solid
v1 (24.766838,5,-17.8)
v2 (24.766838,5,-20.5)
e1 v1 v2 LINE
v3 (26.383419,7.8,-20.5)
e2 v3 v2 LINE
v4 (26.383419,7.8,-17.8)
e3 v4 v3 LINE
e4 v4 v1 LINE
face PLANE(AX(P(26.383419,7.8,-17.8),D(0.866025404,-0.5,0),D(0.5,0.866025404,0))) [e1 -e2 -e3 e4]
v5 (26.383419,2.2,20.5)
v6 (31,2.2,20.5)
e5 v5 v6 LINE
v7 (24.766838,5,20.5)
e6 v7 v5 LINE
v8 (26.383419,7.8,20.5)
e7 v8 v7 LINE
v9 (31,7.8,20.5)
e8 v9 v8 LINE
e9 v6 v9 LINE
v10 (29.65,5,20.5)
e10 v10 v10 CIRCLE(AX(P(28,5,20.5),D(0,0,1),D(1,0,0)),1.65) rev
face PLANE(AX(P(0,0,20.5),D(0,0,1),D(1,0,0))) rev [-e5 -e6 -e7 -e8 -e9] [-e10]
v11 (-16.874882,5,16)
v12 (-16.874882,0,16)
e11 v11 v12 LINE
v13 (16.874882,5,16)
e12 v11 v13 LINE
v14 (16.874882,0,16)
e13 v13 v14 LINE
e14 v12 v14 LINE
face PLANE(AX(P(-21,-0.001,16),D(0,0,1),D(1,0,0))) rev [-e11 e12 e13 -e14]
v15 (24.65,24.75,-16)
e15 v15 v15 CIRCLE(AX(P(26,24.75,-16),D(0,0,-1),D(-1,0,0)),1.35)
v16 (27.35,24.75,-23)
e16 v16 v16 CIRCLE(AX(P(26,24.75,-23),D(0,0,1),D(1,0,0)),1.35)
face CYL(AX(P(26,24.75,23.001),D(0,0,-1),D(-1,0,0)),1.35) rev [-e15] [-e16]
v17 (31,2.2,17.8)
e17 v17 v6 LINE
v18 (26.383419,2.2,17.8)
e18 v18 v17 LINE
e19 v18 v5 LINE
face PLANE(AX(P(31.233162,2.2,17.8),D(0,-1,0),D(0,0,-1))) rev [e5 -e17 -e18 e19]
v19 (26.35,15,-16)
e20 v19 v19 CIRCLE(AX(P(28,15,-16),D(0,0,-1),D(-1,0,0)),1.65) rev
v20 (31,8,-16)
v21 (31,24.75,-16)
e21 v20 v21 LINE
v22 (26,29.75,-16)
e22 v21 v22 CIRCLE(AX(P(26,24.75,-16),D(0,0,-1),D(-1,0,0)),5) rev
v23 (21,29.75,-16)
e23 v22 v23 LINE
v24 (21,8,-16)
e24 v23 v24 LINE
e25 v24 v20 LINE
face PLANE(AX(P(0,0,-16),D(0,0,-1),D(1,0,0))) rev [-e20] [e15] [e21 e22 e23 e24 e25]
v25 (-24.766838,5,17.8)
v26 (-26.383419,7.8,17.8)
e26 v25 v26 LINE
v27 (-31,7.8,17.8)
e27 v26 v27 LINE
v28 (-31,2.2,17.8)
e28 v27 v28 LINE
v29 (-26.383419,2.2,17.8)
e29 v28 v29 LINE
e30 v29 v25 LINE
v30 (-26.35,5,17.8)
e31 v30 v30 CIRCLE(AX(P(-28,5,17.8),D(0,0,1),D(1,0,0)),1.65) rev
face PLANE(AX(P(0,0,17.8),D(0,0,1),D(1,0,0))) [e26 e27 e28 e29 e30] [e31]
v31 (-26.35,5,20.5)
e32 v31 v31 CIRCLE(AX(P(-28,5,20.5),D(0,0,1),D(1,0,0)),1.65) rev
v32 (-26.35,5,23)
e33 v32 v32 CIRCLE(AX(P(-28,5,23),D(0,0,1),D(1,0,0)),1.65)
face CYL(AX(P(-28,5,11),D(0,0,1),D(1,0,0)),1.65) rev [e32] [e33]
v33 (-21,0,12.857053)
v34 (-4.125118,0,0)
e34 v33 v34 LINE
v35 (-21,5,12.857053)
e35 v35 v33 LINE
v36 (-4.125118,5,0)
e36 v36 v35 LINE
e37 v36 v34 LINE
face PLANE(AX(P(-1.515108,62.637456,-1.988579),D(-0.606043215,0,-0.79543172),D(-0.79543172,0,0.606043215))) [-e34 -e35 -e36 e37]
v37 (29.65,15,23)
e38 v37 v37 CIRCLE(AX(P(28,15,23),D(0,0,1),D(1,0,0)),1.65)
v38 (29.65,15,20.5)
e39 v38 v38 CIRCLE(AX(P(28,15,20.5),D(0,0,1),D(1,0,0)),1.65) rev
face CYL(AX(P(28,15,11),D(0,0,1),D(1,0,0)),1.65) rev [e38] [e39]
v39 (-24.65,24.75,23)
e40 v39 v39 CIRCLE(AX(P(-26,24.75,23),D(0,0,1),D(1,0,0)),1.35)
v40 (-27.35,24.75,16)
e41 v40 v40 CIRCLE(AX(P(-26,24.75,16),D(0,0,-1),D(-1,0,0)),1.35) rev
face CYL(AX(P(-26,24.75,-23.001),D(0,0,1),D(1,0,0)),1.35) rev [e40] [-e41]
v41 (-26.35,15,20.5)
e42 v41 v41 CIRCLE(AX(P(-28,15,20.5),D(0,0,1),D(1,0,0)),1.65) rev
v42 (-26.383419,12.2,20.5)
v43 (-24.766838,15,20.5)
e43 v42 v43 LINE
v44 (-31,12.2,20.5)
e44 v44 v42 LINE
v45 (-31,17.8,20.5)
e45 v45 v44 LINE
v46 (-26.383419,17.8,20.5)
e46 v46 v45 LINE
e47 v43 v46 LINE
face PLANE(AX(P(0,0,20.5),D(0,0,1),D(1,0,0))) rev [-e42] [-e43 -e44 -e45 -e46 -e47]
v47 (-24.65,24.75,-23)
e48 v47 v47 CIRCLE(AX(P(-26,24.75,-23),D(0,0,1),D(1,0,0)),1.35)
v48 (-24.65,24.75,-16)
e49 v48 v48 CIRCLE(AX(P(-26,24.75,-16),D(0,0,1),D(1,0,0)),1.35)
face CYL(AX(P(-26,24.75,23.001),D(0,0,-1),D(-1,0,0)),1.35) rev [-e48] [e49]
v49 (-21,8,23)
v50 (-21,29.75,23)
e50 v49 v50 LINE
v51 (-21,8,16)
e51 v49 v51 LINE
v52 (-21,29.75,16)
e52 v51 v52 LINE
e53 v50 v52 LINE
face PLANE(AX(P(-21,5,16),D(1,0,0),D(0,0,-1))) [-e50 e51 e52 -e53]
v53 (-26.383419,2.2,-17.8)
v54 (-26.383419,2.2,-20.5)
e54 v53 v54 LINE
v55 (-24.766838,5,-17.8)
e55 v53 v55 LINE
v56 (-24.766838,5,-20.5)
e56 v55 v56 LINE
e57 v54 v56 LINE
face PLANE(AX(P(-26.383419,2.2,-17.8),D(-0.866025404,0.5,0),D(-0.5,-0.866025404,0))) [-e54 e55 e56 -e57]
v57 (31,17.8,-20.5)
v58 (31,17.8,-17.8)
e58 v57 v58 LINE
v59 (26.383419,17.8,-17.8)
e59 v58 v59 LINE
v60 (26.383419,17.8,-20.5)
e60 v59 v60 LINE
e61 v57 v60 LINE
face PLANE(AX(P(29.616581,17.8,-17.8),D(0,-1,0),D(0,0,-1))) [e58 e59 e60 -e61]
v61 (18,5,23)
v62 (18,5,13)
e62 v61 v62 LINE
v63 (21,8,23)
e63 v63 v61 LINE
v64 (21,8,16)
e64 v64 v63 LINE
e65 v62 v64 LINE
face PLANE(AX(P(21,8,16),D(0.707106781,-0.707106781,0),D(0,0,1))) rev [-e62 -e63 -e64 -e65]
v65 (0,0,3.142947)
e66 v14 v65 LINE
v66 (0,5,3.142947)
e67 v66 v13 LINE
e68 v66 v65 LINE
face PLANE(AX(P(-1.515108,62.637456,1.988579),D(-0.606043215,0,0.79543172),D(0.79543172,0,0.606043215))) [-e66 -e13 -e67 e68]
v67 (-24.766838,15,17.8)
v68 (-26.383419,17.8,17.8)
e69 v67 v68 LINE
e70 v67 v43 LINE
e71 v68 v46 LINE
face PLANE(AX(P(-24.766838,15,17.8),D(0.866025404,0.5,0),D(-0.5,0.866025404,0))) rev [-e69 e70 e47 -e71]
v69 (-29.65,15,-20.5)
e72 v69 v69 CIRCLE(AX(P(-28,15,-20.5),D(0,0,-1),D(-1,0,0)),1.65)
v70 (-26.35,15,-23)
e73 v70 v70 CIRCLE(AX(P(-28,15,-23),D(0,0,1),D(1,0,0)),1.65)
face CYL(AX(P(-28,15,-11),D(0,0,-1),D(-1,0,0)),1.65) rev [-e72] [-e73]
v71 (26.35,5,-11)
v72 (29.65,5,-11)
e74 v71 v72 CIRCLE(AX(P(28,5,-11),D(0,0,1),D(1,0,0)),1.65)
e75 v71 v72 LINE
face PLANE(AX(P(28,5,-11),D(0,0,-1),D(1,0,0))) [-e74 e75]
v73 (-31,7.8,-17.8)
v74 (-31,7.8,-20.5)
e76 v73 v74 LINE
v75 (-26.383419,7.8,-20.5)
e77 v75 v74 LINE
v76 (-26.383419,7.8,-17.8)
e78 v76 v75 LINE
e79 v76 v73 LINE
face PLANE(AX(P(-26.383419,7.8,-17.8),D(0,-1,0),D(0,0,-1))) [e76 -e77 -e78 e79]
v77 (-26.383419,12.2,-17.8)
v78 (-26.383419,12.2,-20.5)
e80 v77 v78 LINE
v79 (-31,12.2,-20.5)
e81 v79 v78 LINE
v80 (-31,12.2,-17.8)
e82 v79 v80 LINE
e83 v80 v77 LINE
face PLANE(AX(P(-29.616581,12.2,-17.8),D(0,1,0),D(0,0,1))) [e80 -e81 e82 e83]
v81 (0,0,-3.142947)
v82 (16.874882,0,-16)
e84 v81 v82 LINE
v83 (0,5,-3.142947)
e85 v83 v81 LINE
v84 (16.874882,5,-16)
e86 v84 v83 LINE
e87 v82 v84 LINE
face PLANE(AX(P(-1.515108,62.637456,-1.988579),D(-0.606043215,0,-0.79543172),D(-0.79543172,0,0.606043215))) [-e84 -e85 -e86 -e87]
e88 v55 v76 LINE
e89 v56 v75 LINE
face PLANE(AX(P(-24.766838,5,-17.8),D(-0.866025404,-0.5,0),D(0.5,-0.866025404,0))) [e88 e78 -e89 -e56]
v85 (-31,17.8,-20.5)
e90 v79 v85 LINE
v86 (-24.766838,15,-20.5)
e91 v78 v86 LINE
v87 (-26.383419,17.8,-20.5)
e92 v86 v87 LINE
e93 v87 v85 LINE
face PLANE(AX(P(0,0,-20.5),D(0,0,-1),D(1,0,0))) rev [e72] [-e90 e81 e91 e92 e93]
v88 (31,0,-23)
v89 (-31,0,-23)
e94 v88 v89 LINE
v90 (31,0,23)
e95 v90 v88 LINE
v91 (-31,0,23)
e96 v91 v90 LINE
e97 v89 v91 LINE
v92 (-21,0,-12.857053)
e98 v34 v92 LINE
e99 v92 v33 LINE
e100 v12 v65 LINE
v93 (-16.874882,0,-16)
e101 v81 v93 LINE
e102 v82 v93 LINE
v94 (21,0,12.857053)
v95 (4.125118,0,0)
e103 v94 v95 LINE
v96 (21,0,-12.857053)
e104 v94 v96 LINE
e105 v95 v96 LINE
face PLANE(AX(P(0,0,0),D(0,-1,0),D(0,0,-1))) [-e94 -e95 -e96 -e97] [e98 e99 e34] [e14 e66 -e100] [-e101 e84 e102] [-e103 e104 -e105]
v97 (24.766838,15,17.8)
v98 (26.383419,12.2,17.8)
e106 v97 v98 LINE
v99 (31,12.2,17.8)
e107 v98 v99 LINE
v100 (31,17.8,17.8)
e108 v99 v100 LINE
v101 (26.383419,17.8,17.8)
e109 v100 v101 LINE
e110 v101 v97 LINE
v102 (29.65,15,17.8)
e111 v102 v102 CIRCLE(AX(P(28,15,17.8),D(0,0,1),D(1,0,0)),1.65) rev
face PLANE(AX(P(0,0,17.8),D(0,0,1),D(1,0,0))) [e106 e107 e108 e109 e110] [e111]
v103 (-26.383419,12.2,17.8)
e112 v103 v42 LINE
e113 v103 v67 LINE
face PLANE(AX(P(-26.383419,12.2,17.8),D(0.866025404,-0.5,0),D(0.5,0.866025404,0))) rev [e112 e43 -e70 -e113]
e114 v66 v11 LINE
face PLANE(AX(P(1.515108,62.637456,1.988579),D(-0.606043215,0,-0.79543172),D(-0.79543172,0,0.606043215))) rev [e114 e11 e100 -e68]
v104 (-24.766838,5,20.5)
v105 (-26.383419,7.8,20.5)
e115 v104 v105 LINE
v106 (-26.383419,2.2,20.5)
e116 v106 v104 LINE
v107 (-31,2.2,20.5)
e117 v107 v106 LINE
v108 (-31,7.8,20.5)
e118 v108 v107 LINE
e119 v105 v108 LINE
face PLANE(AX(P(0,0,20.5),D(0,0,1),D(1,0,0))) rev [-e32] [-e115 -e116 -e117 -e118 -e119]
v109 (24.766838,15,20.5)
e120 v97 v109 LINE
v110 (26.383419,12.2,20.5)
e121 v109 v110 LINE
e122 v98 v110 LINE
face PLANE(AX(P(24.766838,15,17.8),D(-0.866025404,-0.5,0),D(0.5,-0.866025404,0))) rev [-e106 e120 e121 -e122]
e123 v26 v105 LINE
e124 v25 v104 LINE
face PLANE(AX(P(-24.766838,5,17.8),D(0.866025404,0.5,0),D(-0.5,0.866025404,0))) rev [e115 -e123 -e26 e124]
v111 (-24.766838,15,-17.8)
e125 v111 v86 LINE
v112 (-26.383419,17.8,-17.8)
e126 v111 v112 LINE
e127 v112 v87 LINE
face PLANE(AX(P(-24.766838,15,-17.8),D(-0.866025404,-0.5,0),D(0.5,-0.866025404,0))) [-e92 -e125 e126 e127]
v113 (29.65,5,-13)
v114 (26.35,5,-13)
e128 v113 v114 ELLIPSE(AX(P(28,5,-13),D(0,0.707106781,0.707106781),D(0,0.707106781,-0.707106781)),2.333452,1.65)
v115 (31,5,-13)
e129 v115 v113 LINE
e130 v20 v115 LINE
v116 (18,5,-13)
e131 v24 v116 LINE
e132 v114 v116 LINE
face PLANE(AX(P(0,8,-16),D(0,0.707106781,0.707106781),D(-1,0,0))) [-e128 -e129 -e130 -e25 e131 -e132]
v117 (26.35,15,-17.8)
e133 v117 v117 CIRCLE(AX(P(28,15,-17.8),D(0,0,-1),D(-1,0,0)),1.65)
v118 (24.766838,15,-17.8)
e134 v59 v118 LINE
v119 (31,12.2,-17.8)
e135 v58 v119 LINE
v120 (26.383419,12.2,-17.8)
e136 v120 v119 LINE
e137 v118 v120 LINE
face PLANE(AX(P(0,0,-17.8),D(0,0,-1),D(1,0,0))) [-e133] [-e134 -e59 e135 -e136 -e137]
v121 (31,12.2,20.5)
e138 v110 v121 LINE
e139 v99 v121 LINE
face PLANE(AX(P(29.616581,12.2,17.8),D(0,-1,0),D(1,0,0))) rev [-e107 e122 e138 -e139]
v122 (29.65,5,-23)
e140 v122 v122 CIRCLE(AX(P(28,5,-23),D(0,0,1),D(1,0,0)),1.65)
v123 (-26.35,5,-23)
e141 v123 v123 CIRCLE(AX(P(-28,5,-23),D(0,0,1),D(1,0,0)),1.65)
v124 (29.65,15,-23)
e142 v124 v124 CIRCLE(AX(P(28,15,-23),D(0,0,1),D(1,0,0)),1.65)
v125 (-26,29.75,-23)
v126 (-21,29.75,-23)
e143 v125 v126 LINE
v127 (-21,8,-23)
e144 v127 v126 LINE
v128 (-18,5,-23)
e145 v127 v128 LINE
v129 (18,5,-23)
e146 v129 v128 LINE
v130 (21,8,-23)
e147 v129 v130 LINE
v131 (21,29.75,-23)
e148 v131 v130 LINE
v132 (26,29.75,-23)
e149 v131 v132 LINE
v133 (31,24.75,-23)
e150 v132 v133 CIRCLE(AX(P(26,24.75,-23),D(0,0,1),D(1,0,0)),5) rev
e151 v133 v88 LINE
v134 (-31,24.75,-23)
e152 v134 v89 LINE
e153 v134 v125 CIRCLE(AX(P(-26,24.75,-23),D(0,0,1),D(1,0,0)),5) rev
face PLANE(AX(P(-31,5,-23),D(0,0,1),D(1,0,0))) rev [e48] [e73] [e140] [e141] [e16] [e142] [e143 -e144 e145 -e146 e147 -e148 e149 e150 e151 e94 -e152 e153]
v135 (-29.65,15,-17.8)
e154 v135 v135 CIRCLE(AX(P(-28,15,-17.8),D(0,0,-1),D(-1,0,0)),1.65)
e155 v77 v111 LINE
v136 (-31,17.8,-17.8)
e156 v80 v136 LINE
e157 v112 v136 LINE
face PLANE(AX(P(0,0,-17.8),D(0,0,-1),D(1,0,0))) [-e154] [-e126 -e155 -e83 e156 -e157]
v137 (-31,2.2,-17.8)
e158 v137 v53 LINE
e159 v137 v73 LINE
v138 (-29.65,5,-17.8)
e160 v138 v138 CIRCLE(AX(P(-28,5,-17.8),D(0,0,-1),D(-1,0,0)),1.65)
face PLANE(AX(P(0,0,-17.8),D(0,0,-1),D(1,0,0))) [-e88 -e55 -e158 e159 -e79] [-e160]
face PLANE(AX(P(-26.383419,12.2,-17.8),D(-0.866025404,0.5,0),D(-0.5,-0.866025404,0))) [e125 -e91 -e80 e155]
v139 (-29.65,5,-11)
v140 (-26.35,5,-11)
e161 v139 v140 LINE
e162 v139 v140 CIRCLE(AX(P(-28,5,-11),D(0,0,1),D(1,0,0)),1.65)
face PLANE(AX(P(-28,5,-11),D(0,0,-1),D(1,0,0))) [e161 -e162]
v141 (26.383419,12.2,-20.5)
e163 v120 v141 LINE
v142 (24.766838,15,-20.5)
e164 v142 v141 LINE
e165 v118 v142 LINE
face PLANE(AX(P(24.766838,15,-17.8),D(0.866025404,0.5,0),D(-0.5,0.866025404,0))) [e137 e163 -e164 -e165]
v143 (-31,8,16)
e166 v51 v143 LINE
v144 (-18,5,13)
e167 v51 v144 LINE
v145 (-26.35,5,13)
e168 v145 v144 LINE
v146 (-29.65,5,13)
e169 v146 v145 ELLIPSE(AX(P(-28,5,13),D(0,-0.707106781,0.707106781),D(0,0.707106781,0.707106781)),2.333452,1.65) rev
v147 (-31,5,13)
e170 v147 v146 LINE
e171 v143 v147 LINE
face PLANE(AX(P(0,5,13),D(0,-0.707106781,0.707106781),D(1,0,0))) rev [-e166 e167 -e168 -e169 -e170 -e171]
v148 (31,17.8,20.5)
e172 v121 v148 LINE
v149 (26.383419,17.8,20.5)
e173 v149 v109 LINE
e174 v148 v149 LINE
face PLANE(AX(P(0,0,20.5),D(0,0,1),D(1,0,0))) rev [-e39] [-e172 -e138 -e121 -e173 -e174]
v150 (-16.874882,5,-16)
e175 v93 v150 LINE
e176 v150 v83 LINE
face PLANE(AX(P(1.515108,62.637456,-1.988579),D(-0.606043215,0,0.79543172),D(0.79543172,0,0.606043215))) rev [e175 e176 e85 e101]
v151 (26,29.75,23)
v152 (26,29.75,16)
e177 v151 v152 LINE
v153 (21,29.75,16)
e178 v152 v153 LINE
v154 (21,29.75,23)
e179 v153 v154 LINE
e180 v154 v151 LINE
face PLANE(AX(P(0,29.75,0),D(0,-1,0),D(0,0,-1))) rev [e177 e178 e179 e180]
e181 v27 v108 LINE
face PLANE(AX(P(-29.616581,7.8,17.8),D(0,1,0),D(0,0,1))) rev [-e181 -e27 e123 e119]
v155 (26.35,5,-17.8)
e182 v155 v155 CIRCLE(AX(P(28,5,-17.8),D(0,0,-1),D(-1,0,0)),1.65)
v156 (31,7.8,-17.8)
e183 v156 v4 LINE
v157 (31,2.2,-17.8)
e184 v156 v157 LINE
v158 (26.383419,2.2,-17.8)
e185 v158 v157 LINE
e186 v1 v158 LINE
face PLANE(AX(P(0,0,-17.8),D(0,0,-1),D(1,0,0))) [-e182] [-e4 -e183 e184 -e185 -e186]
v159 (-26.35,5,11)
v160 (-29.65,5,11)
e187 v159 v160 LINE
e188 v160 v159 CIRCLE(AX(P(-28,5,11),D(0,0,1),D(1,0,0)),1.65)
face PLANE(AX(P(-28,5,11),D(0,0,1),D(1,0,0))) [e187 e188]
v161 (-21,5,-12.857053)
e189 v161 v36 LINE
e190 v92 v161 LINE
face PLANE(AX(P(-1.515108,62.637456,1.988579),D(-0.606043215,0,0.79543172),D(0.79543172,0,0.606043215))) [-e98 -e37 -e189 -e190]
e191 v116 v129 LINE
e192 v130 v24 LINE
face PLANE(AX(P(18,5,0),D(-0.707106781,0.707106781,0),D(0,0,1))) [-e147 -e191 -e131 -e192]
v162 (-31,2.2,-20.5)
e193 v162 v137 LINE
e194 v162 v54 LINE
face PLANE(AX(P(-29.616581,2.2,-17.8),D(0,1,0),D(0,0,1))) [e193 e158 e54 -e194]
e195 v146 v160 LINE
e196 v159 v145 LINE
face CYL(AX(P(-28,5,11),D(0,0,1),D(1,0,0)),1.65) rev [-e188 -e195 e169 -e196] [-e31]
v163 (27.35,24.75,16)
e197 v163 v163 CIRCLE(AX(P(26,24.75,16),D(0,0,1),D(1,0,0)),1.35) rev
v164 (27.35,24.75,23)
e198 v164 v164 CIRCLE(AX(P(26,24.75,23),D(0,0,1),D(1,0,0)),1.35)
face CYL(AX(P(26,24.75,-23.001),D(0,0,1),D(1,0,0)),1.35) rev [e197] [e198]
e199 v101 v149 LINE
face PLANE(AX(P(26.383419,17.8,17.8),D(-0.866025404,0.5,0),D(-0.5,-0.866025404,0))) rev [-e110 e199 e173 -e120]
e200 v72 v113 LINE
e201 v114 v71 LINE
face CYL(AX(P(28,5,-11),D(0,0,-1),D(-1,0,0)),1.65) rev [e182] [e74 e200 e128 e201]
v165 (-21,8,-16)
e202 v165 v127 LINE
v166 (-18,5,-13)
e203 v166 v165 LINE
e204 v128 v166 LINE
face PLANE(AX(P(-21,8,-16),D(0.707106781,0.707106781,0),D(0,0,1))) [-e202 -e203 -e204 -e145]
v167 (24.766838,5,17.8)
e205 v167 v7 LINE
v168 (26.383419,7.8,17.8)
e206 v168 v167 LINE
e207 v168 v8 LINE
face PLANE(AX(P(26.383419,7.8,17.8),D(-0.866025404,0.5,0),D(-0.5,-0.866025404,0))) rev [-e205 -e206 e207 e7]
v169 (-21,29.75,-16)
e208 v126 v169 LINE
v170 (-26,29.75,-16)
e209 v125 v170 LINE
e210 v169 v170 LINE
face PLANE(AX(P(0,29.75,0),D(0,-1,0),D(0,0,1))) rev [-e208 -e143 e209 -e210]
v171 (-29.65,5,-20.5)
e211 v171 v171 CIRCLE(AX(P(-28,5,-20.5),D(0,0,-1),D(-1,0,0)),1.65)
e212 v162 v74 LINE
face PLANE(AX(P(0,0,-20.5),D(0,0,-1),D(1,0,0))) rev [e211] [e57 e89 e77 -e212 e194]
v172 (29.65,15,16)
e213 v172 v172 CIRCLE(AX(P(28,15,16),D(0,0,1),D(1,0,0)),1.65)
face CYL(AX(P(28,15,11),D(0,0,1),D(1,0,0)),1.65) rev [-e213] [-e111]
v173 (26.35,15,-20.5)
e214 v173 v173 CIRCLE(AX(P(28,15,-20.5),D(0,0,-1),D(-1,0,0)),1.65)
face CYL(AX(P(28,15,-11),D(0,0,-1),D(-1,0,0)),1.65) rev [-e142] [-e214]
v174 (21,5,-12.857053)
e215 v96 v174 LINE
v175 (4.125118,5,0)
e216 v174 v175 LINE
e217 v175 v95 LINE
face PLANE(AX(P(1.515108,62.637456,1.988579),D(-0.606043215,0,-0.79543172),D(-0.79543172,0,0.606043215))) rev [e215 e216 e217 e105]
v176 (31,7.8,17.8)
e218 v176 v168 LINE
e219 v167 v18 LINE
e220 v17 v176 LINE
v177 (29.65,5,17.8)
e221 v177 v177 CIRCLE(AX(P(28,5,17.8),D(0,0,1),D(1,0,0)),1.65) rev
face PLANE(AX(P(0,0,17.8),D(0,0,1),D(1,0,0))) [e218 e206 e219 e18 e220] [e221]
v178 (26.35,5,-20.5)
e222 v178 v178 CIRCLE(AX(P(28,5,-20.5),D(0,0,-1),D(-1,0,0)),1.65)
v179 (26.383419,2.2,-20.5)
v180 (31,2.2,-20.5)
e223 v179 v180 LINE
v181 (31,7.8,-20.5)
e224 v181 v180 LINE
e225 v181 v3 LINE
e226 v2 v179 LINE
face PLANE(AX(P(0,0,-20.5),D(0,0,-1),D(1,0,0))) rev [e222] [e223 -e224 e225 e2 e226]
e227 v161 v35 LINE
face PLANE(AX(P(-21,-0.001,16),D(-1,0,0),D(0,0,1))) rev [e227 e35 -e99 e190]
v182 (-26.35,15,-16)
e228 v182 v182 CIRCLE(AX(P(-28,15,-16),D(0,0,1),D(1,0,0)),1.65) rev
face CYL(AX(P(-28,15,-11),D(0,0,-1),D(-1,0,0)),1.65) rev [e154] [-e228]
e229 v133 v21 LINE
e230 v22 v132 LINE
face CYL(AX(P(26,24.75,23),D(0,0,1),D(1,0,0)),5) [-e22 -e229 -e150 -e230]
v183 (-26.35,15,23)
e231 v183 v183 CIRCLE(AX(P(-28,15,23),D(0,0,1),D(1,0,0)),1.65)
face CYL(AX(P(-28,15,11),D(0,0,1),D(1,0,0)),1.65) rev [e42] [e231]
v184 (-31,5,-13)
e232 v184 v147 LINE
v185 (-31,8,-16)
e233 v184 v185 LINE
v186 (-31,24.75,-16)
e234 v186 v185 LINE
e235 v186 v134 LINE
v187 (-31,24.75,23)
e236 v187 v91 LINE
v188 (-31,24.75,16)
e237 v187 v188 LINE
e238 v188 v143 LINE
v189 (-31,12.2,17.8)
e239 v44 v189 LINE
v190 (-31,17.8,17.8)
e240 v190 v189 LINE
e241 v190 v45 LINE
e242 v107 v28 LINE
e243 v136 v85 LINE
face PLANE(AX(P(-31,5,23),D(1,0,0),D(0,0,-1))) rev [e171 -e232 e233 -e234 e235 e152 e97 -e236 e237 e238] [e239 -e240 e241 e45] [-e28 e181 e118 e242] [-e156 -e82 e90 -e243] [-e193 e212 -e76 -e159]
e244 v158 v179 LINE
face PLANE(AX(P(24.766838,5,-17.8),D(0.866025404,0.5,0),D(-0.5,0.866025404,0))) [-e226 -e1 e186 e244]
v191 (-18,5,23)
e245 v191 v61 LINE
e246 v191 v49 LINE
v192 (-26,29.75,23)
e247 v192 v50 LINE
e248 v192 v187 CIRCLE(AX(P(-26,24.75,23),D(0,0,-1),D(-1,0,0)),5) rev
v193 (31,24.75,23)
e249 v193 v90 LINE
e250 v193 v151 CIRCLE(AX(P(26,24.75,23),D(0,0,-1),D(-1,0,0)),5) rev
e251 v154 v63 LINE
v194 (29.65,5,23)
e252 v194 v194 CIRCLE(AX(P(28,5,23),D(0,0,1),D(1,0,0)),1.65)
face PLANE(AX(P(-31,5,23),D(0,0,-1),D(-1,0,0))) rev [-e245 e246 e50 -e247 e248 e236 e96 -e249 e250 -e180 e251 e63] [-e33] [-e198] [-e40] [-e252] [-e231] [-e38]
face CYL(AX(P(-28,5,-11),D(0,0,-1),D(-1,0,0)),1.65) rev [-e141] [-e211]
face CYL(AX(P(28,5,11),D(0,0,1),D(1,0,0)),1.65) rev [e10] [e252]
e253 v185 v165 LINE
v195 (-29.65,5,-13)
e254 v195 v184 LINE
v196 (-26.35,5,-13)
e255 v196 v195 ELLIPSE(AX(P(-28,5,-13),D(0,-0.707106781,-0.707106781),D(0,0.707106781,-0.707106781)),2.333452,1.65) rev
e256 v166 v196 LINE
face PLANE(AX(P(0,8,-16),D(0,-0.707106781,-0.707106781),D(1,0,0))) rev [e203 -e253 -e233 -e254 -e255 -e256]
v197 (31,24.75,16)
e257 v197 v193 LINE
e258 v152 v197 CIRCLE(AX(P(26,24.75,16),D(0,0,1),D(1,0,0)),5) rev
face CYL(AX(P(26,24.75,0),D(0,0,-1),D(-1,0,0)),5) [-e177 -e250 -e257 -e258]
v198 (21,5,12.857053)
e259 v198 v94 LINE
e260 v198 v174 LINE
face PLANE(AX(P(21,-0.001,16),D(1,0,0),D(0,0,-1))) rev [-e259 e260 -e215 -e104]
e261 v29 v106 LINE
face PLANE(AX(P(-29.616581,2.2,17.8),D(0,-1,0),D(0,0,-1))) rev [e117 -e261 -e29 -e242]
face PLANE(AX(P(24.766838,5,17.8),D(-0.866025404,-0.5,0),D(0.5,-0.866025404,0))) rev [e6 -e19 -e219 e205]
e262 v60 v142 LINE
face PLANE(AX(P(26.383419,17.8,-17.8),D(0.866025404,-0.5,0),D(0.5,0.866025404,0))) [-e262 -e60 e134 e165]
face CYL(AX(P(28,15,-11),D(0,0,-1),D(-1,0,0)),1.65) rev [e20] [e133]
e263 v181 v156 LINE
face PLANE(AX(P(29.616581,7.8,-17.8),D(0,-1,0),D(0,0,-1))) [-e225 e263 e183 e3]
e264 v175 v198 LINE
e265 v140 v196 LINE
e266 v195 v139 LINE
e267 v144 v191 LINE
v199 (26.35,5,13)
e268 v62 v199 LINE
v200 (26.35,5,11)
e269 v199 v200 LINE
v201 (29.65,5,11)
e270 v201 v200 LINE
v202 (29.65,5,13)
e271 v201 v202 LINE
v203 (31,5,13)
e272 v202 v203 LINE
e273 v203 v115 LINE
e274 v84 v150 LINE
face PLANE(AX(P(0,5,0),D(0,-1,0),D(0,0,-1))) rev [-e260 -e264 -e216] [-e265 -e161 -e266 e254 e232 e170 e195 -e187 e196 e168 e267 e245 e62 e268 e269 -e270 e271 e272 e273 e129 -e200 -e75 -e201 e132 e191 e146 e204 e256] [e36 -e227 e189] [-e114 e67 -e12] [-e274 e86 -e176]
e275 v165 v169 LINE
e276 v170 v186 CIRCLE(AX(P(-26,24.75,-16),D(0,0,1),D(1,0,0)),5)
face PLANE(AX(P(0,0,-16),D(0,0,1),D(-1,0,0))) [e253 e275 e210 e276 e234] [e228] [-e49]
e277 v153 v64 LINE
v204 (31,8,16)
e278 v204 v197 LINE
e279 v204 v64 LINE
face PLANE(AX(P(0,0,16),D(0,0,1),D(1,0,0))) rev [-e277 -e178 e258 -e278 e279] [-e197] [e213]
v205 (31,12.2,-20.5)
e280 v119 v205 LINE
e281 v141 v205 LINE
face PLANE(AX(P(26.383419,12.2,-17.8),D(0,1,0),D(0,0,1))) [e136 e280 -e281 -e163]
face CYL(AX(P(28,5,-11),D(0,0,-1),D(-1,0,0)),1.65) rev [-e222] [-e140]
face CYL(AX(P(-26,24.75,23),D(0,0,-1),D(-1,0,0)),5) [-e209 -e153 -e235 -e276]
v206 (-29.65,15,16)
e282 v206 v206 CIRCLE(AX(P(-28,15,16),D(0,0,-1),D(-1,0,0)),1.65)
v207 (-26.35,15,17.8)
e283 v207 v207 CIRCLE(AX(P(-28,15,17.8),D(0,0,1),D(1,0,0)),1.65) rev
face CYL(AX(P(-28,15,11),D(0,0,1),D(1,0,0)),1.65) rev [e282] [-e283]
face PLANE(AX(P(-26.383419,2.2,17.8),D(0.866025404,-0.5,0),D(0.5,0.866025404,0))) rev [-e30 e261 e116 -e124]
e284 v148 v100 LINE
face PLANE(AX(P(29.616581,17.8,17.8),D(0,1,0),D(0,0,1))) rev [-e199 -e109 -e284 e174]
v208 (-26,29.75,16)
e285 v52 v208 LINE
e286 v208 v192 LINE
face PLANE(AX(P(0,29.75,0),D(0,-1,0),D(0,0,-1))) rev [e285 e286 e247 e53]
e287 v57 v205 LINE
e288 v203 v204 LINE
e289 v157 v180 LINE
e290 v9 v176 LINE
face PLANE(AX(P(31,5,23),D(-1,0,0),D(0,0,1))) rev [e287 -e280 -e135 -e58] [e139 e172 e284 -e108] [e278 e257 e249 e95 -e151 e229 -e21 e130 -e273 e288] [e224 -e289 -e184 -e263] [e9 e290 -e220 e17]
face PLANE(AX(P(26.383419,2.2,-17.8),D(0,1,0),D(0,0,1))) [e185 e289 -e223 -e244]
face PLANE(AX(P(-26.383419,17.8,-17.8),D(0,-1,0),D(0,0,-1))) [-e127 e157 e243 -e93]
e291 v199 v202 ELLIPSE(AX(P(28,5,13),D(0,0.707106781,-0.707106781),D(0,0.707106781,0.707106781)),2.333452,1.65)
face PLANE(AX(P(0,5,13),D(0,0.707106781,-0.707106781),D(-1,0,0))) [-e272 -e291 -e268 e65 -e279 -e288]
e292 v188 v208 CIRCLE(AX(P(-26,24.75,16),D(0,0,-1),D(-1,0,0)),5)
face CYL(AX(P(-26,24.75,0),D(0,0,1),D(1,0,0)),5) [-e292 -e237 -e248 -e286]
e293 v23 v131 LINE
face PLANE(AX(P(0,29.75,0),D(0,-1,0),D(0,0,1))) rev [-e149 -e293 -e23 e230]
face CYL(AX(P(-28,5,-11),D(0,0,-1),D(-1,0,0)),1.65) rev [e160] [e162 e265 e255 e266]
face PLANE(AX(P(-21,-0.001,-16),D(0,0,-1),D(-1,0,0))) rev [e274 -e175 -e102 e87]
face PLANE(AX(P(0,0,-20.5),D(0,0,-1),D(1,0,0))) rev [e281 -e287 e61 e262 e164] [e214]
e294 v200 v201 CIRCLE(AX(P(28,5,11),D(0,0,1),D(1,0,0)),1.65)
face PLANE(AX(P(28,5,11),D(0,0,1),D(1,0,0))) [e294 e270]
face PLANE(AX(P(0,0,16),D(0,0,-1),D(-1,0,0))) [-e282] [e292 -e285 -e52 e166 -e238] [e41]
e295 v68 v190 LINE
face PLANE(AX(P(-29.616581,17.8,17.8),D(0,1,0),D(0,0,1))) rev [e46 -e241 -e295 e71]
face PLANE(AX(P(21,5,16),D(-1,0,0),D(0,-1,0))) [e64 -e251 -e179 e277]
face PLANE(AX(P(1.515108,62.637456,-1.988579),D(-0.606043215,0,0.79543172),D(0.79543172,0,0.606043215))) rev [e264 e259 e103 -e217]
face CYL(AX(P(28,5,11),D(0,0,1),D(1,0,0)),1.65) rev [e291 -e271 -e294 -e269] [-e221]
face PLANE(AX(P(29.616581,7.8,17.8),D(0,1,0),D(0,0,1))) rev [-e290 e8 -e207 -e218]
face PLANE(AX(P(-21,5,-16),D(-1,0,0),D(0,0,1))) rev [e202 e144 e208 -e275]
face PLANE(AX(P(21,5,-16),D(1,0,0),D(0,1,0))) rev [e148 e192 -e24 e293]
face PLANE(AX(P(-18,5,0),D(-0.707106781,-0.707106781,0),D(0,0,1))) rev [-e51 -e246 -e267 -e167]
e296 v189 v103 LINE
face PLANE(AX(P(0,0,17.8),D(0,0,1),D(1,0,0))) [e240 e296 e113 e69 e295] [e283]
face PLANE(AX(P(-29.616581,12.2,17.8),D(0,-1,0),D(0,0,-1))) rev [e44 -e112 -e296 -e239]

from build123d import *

# Parameters (mm, degrees)
SKETCH_1_W          = 62
SKETCH_1_H          = 46
EXTRUDE_1_DEPTH     = 5
SKETCH_2_W          = 10
SKETCH_2_H          = 15
EXTRUDE_2_DEPTH     = 7
SKETCH_3_R          = 1.65
CUT_EXTRUDE_1_DEPTH = 12
SKETCH_7_W          = 10
SKETCH_7_H          = 7
EXTRUDE_4_DEPTH     = 9.75
CUT_EXTRUDE_4_REACH = 64.945
SKETCH_8_R          = 1.35
CUT_EXTRUDE_2_DEPTH = 2.7
CUT_EXTRUDE_3_REACH = 50.735
SKETCH_5_W          = 42
SKETCH_5_H          = 32
EXTRUDE_3_DEPTH     = 5
CHAMFER_4_SIZE      = 3
FILLET_1_R          = 5


with BuildPart() as part:
    # 草图1 → 凸台-拉伸1 (new body)
    with BuildSketch(Plane(origin=(0, 0, 0), x_dir=(1, 0, 0), z_dir=(0, 1, 0))):
        Rectangle(SKETCH_1_W, SKETCH_1_H)
    extrude(amount=EXTRUDE_1_DEPTH)

    # 草图2 → 凸台-拉伸2 (add)
    with BuildSketch(Plane.XY.offset(23)):
        with Locations((-26, 12.5)):
            Rectangle(SKETCH_2_W, SKETCH_2_H)
        with Locations((26, 12.5)):
            Rectangle(SKETCH_2_W, SKETCH_2_H)
    extrude_2 = extrude(amount=-EXTRUDE_2_DEPTH)

    # 草图3 → 切除-拉伸1 (cut)
    with BuildSketch(Plane.XY.offset(23)):
        with Locations((-28, 15)):
            Circle(SKETCH_3_R)
        with Locations((-28, 5)):
            Circle(SKETCH_3_R)
        with Locations((28, 5)):
            Circle(SKETCH_3_R)
        with Locations((28, 15)):
            Circle(SKETCH_3_R)
    cut_extrude_1 = extrude(amount=-CUT_EXTRUDE_1_DEPTH, mode=Mode.SUBTRACT)

    # 草图7 → 凸台-拉伸4 (add)
    with BuildSketch(Plane(origin=(0, 20, 0), x_dir=(1, 0, 0), z_dir=(0, 1, 0))):
        with Locations((-26, -19.5)):
            Rectangle(SKETCH_7_W, SKETCH_7_H)
        with Locations((26, -19.5)):
            Rectangle(SKETCH_7_W, SKETCH_7_H)
    extrude_4 = extrude(amount=EXTRUDE_4_DEPTH)

    # 草图8 → 切除-拉伸4 (cut, up to next)
    with BuildSketch(Plane.XY.offset(23), mode=Mode.PRIVATE) as cut_extrude_4_sk1:
        with Locations((-26, 24.75)):
            Circle(SKETCH_8_R)
    cut_extrude_4_tool1 = extrude(cut_extrude_4_sk1.sketch, amount=-CUT_EXTRUDE_4_REACH, mode=Mode.PRIVATE) & part.part
    # 草图8 → 切除-拉伸4 (cut, up to next)
    with BuildSketch(Plane.XY.offset(23), mode=Mode.PRIVATE) as cut_extrude_4_sk2:
        with Locations((26, 24.75)):
            Circle(SKETCH_8_R)
    cut_extrude_4_tool2 = extrude(cut_extrude_4_sk2.sketch, amount=-CUT_EXTRUDE_4_REACH, mode=Mode.PRIVATE) & part.part
    cut_extrude_4_1 = cut_extrude_4_tool1.solids().sort_by_distance((-26, 24.75, 23))[0]
    add(cut_extrude_4_1, mode=Mode.SUBTRACT)
    cut_extrude_4_2 = cut_extrude_4_tool2.solids().sort_by_distance((26, 24.75, 23))[0]
    add(cut_extrude_4_2, mode=Mode.SUBTRACT)
    cut_extrude_4 = cut_extrude_4_1 + cut_extrude_4_2  # 切除-拉伸4 as one shape, for the pattern or mirror that repeats it

    # 草图4 → 切除-拉伸2 (cut)
    with BuildSketch(Plane.XY.offset(20.5)):
        Polygon((-29.616580754, 17.8), (-31.233161507, 17.8), (-31.233161507, 15), (-31.233161507, 12.2), (-29.616580754, 12.2), (-26.383419246, 12.2), (-24.766838493, 15), (-26.383419246, 17.8), align=None)
        Polygon((-24.766838493, 5), (-26.383419246, 7.8), (-29.616580754, 7.8), (-31.233161507, 7.8), (-31.233161507, 5), (-31.233161507, 2.2), (-29.616580754, 2.2), (-26.383419246, 2.2), align=None)
        Polygon((24.766838493, 15), (26.383419246, 12.2), (29.616580754, 12.2), (31.233161507, 12.2), (31.233161507, 15), (31.233161507, 17.8), (29.616580754, 17.8), (26.383419246, 17.8), align=None)
        Polygon((24.766838493, 5), (26.383419246, 2.2), (29.616580754, 2.2), (31.233161507, 2.2), (31.233161507, 5), (31.233161507, 7.8), (29.616580754, 7.8), (26.383419246, 7.8), align=None)
    cut_extrude_2 = extrude(amount=-CUT_EXTRUDE_2_DEPTH, mode=Mode.SUBTRACT)

    # 镜向1: 凸台-拉伸2, 切除-拉伸1, 凸台-拉伸4, 切除-拉伸4, 切除-拉伸2 across plane
    add(extrude_2.mirror(Plane.XY))
    add(cut_extrude_1.mirror(Plane.XY), mode=Mode.SUBTRACT)
    add(extrude_4.mirror(Plane.XY))
    add(cut_extrude_4.mirror(Plane.XY), mode=Mode.SUBTRACT)
    add(cut_extrude_2.mirror(Plane.XY), mode=Mode.SUBTRACT)

    # 草图5 → 切除-拉伸3 (cut, up to next)
    with BuildSketch(Plane(origin=(0, 29.75, 0), x_dir=(1, 0, 0), z_dir=(0, 1, 0)), mode=Mode.PRIVATE) as cut_extrude_3_sk1:
        Rectangle(SKETCH_5_W, SKETCH_5_H)
    cut_extrude_3_tool1 = extrude(cut_extrude_3_sk1.sketch, amount=-CUT_EXTRUDE_3_REACH, mode=Mode.PRIVATE) & part.part
    add(cut_extrude_3_tool1.solids().sort_by_distance((0, 29.75, 0))[0], mode=Mode.SUBTRACT)

    # 草图6 → 凸台-拉伸3 (add)
    with BuildSketch(Plane(origin=(0, 0, 0), x_dir=(1, 0, 0), z_dir=(0, 1, 0))):
        Polygon((-22.515108038, 14.0114207), (-4.12511837, 0), (0, 3.142947329), (-19.484891962, 17.9885793), align=None)
        Polygon((0, 3.142947329), (4.12511837, 0), (22.515108038, 14.0114207), (19.484891962, 17.9885793), align=None)
        Polygon((-4.12511837, 0), (0, -3.142947329), (4.12511837, 0), (0, 3.142947329), align=None)
        Polygon((-19.484891962, -17.9885793), (0, -3.142947329), (-4.12511837, 0), (-22.515108038, -14.0114207), align=None)
        Polygon((0, -3.142947329), (19.484891962, -17.9885793), (22.515108038, -14.0114207), (4.12511837, 0), align=None)
    extrude(amount=EXTRUDE_3_DEPTH)

    # 倒角4
    # the kernel refuses this chamfer: 3 mm, written as the material it adds along each edge
    with BuildSketch(Plane(origin=(-21, 5, 23), x_dir=(-0.02749587661058678, 0.9996219169112968, 0), z_dir=(0, 0, -1)), Plane(origin=(21, 5, 23), x_dir=(-0.9996219169112968, -0.02749587661058619, 0), z_dir=(0, 0, -1)), Plane(origin=(-21, 5, -23), x_dir=(0.9996219169112968, -0.02749587661058648, 0), z_dir=(0, 0, 1))) as chamfer_4_piece_1:
        Polygon((CHAMFER_4_SIZE * 0.999621916911, CHAMFER_4_SIZE * 0.0274958766106), (-CHAMFER_4_SIZE * 0.0274958766106, CHAMFER_4_SIZE * 0.999621916911), (0, 0), align=None)
    extrude(amount=7)
    with BuildSketch(Plane(origin=(34.065048964, 5, -16), x_dir=(0, -0.027495876610586494, 0.9996219169112968), z_dir=(-1, 0, 0))) as chamfer_4_piece_2_section:
        Polygon((CHAMFER_4_SIZE * 0.999621916911, CHAMFER_4_SIZE * 0.0274958766106), (-CHAMFER_4_SIZE * 0.0274958766106, CHAMFER_4_SIZE * 0.999621916911), (0, 0), align=None)
    chamfer_4_piece_2 = extrude(amount=13.065048964, mode=Mode.PRIVATE)
    chamfer_4_piece_2 = split(chamfer_4_piece_2, bisect_by=Plane(origin=(31, 6.10549046, -15.071672934), z_dir=(-1, 0, 0)), keep=Keep.TOP, mode=Mode.PRIVATE)
    chamfer_4_piece_2 = chamfer_4_piece_2 - Plane(origin=(28, 5, -15.071672934), x_dir=(1, 0, 0), z_dir=(0, 0, -1)) * Cylinder(1.65, 39, mode=Mode.PRIVATE)
    add(chamfer_4_piece_2)
    with BuildSketch(Plane(origin=(21, 5, -23), x_dir=(-0.9996219169112968, -0.02749587661058619, 0), z_dir=(0, 0, 1))) as chamfer_4_piece_3:
        Polygon((CHAMFER_4_SIZE * 0.999621916911, -CHAMFER_4_SIZE * 0.0274958766106), (-CHAMFER_4_SIZE * 0.0274958766106, -CHAMFER_4_SIZE * 0.999621916911), (0, 0), align=None)
    extrude(amount=7)
    with BuildSketch(Plane(origin=(-34.065048964, 5, -16), x_dir=(0, -0.027495876610586494, 0.9996219169112968), z_dir=(1, 0, 0))) as chamfer_4_piece_4_section:
        Polygon((CHAMFER_4_SIZE * 0.999621916911, -CHAMFER_4_SIZE * 0.0274958766106), (-CHAMFER_4_SIZE * 0.0274958766106, -CHAMFER_4_SIZE * 0.999621916911), (0, 0), align=None)
    chamfer_4_piece_4 = extrude(amount=13.065048964, mode=Mode.PRIVATE)
    chamfer_4_piece_4 = split(chamfer_4_piece_4, bisect_by=Plane(origin=(-31, 6.105490461, -15.071672933), z_dir=(1, 0, 0)), keep=Keep.TOP, mode=Mode.PRIVATE)
    chamfer_4_piece_4 = chamfer_4_piece_4 - Plane(origin=(-28, 5, -15.071672933), x_dir=(1, 0, 0), z_dir=(0, 0, -1)) * Cylinder(1.65, 39, mode=Mode.PRIVATE)
    add(chamfer_4_piece_4)
    with BuildSketch(Plane(origin=(-34.065048964, 5, 16), x_dir=(0, -0.027495876610586494, -0.9996219169112968), z_dir=(1, 0, 0))) as chamfer_4_piece_5_section:
        Polygon((CHAMFER_4_SIZE * 0.999621916911, CHAMFER_4_SIZE * 0.0274958766106), (-CHAMFER_4_SIZE * 0.0274958766106, CHAMFER_4_SIZE * 0.999621916911), (0, 0), align=None)
    chamfer_4_piece_5 = extrude(amount=13.065048964, mode=Mode.PRIVATE)
    chamfer_4_piece_5 = split(chamfer_4_piece_5, bisect_by=Plane(origin=(-31, 6.105490461, 15.071672933), z_dir=(1, 0, 0)), keep=Keep.TOP, mode=Mode.PRIVATE)
    chamfer_4_piece_5 = chamfer_4_piece_5 - Plane(origin=(-28, 5, 15.071672933), x_dir=(1, 0, 0), z_dir=(0, 0, 1)) * Cylinder(1.65, 39, mode=Mode.PRIVATE)
    add(chamfer_4_piece_5)
    with BuildSketch(Plane(origin=(34.065048964, 5, 16), x_dir=(0, -0.027495876610586494, -0.9996219169112968), z_dir=(-1, 0, 0))) as chamfer_4_piece_6_section:
        Polygon((CHAMFER_4_SIZE * 0.999621916911, -CHAMFER_4_SIZE * 0.0274958766106), (-CHAMFER_4_SIZE * 0.0274958766106, -CHAMFER_4_SIZE * 0.999621916911), (0, 0), align=None)
    chamfer_4_piece_6 = extrude(amount=13.065048964, mode=Mode.PRIVATE)
    chamfer_4_piece_6 = split(chamfer_4_piece_6, bisect_by=Plane(origin=(31, 6.10549046, 15.071672934), z_dir=(-1, 0, 0)), keep=Keep.TOP, mode=Mode.PRIVATE)
    chamfer_4_piece_6 = chamfer_4_piece_6 - Plane(origin=(28, 5, 15.071672934), x_dir=(1, 0, 0), z_dir=(0, 0, 1)) * Cylinder(1.65, 39, mode=Mode.PRIVATE)
    add(chamfer_4_piece_6)
    with BuildSketch(Plane(origin=(-21, 5, 23), x_dir=(-0.02749587661058678, 0.9996219169112968, 0), z_dir=(0, 0, -1))) as chamfer_4_piece_7a_section:
        Polygon((CHAMFER_4_SIZE * 0.999621916911, CHAMFER_4_SIZE * 0.0274958766106), (-CHAMFER_4_SIZE * 0.0274958766106, CHAMFER_4_SIZE * 0.999621916911), (0, 0), align=None)
    chamfer_4_piece_7a = extrude(amount=14.715048964, mode=Mode.PRIVATE)
    chamfer_4_piece_7a = split(chamfer_4_piece_7a, bisect_by=Plane(origin=(-19.8988735, 5.929641192, 16), z_dir=(0, 0, -1)), keep=Keep.TOP, mode=Mode.PRIVATE)
    chamfer_4_piece_7a = split(chamfer_4_piece_7a, bisect_by=Plane(origin=(-20.858643002, 5.929641192, 12.749352101), z_dir=(0.6060432152628566, 0, 0.7954317200324984)), keep=Keep.TOP, mode=Mode.PRIVATE)
    with BuildSketch(Plane(origin=(-34.065048964, 5, 16), x_dir=(0, -0.027495876610586494, -0.9996219169112968), z_dir=(1, 0, 0))) as chamfer_4_piece_7b_section:
        Polygon((CHAMFER_4_SIZE * 0.999621916911, CHAMFER_4_SIZE * 0.0274958766106), (-CHAMFER_4_SIZE * 0.0274958766106, CHAMFER_4_SIZE * 0.999621916911), (0, 0), align=None)
    chamfer_4_piece_7b = extrude(amount=20.780097928, mode=Mode.PRIVATE)
    chamfer_4_piece_7b = split(chamfer_4_piece_7b, bisect_by=Plane(origin=(-21, 5.915915897, 14.873215442), z_dir=(1, 0, 0)), keep=Keep.TOP, mode=Mode.PRIVATE)
    chamfer_4_piece_7b = split(chamfer_4_piece_7b, bisect_by=Plane(origin=(-17.170062576, 5.915915897, 16.224899768), z_dir=(-0.6060432152628568, 0, -0.7954317200324983)), keep=Keep.TOP, mode=Mode.PRIVATE)
    chamfer_4_piece_7 = chamfer_4_piece_7a & chamfer_4_piece_7b
    add(chamfer_4_piece_7)
    with BuildSketch(Plane(origin=(21, 5, 23), x_dir=(-0.9996219169112968, -0.02749587661058619, 0), z_dir=(0, 0, -1))) as chamfer_4_piece_8a_section:
        Polygon((CHAMFER_4_SIZE * 0.999621916911, CHAMFER_4_SIZE * 0.0274958766106), (-CHAMFER_4_SIZE * 0.0274958766106, CHAMFER_4_SIZE * 0.999621916911), (0, 0), align=None)
    chamfer_4_piece_8a = extrude(amount=14.715048964, mode=Mode.PRIVATE)
    chamfer_4_piece_8a = split(chamfer_4_piece_8a, bisect_by=Plane(origin=(20.858643002, 5.929641192, 12.749352101), z_dir=(-0.6060432152628565, 0, 0.7954317200324984)), keep=Keep.TOP, mode=Mode.PRIVATE)
    chamfer_4_piece_8a = split(chamfer_4_piece_8a, bisect_by=Plane(origin=(19.8988735, 5.929641192, 16), z_dir=(0, 0, -1)), keep=Keep.TOP, mode=Mode.PRIVATE)
    with BuildSketch(Plane(origin=(34.065048964, 5, 16), x_dir=(0, -0.027495876610586494, -0.9996219169112968), z_dir=(-1, 0, 0))) as chamfer_4_piece_8b_section:
        Polygon((CHAMFER_4_SIZE * 0.999621916911, -CHAMFER_4_SIZE * 0.0274958766106), (-CHAMFER_4_SIZE * 0.0274958766106, -CHAMFER_4_SIZE * 0.999621916911), (0, 0), align=None)
    chamfer_4_piece_8b = extrude(amount=20.780097928, mode=Mode.PRIVATE)
    chamfer_4_piece_8b = split(chamfer_4_piece_8b, bisect_by=Plane(origin=(17.170062576, 5.915915897, 16.224899768), z_dir=(0.6060432152628563, 0, -0.7954317200324986)), keep=Keep.TOP, mode=Mode.PRIVATE)
    chamfer_4_piece_8b = split(chamfer_4_piece_8b, bisect_by=Plane(origin=(21, 5.915915897, 14.873215442), z_dir=(-1, 0, 0)), keep=Keep.TOP, mode=Mode.PRIVATE)
    chamfer_4_piece_8 = chamfer_4_piece_8a & chamfer_4_piece_8b
    add(chamfer_4_piece_8)
    with BuildSketch(Plane(origin=(34.065048964, 5, -16), x_dir=(0, -0.027495876610586494, 0.9996219169112968), z_dir=(-1, 0, 0))) as chamfer_4_piece_9a_section:
        Polygon((CHAMFER_4_SIZE * 0.999621916911, CHAMFER_4_SIZE * 0.0274958766106), (-CHAMFER_4_SIZE * 0.0274958766106, CHAMFER_4_SIZE * 0.999621916911), (0, 0), align=None)
    chamfer_4_piece_9a = extrude(amount=20.780097928, mode=Mode.PRIVATE)
    chamfer_4_piece_9a = split(chamfer_4_piece_9a, bisect_by=Plane(origin=(17.170062576, 5.915915897, -16.224899768), z_dir=(0.6060432152628568, 0, 0.7954317200324984)), keep=Keep.TOP, mode=Mode.PRIVATE)
    chamfer_4_piece_9a = split(chamfer_4_piece_9a, bisect_by=Plane(origin=(21, 5.915915897, -14.873215442), z_dir=(-1, 0, 0)), keep=Keep.TOP, mode=Mode.PRIVATE)
    with BuildSketch(Plane(origin=(21, 5, -23), x_dir=(-0.9996219169112968, -0.02749587661058619, 0), z_dir=(0, 0, 1))) as chamfer_4_piece_9b_section:
        Polygon((CHAMFER_4_SIZE * 0.999621916911, -CHAMFER_4_SIZE * 0.0274958766106), (-CHAMFER_4_SIZE * 0.0274958766106, -CHAMFER_4_SIZE * 0.999621916911), (0, 0), align=None)
    chamfer_4_piece_9b = extrude(amount=14.715048964, mode=Mode.PRIVATE)
    chamfer_4_piece_9b = split(chamfer_4_piece_9b, bisect_by=Plane(origin=(20.858643002, 5.929641192, -12.749352101), z_dir=(-0.6060432152628568, 0, -0.7954317200324983)), keep=Keep.TOP, mode=Mode.PRIVATE)
    chamfer_4_piece_9b = split(chamfer_4_piece_9b, bisect_by=Plane(origin=(19.8988735, 5.929641192, -16), z_dir=(0, 0, 1)), keep=Keep.TOP, mode=Mode.PRIVATE)
    chamfer_4_piece_9 = chamfer_4_piece_9a & chamfer_4_piece_9b
    add(chamfer_4_piece_9)
    with BuildSketch(Plane(origin=(-21, 5, -23), x_dir=(0.9996219169112968, -0.02749587661058648, 0), z_dir=(0, 0, 1))) as chamfer_4_piece_10a_section:
        Polygon((CHAMFER_4_SIZE * 0.999621916911, CHAMFER_4_SIZE * 0.0274958766106), (-CHAMFER_4_SIZE * 0.0274958766106, CHAMFER_4_SIZE * 0.999621916911), (0, 0), align=None)
    chamfer_4_piece_10a = extrude(amount=14.715048964, mode=Mode.PRIVATE)
    chamfer_4_piece_10a = split(chamfer_4_piece_10a, bisect_by=Plane(origin=(-20.858643002, 5.929641192, -12.749352101), z_dir=(0.6060432152628563, 0, -0.7954317200324986)), keep=Keep.TOP, mode=Mode.PRIVATE)
    chamfer_4_piece_10a = split(chamfer_4_piece_10a, bisect_by=Plane(origin=(-19.8988735, 5.929641192, -16), z_dir=(0, 0, 1)), keep=Keep.TOP, mode=Mode.PRIVATE)
    with BuildSketch(Plane(origin=(-34.065048964, 5, -16), x_dir=(0, -0.027495876610586494, 0.9996219169112968), z_dir=(1, 0, 0))) as chamfer_4_piece_10b_section:
        Polygon((CHAMFER_4_SIZE * 0.999621916911, -CHAMFER_4_SIZE * 0.0274958766106), (-CHAMFER_4_SIZE * 0.0274958766106, -CHAMFER_4_SIZE * 0.999621916911), (0, 0), align=None)
    chamfer_4_piece_10b = extrude(amount=20.780097928, mode=Mode.PRIVATE)
    chamfer_4_piece_10b = split(chamfer_4_piece_10b, bisect_by=Plane(origin=(-17.170062576, 5.915915897, -16.224899768), z_dir=(-0.6060432152628565, 0, 0.7954317200324984)), keep=Keep.TOP, mode=Mode.PRIVATE)
    chamfer_4_piece_10b = split(chamfer_4_piece_10b, bisect_by=Plane(origin=(-21, 5.915915897, -14.873215442), z_dir=(1, 0, 0)), keep=Keep.TOP, mode=Mode.PRIVATE)
    chamfer_4_piece_10 = chamfer_4_piece_10a & chamfer_4_piece_10b
    add(chamfer_4_piece_10)

    # 圆角1
    fillet_1_edges = [part.edges().sort_by_distance(p)[0] for p in [
        (-31, 29.75, -19.5),
        (31, 29.75, -19.5),
        (-31, 29.75, 19.5),
        (31, 29.75, 19.5),
    ]]
    fillet(fillet_1_edges, radius=FILLET_1_R)


solid = part.part
